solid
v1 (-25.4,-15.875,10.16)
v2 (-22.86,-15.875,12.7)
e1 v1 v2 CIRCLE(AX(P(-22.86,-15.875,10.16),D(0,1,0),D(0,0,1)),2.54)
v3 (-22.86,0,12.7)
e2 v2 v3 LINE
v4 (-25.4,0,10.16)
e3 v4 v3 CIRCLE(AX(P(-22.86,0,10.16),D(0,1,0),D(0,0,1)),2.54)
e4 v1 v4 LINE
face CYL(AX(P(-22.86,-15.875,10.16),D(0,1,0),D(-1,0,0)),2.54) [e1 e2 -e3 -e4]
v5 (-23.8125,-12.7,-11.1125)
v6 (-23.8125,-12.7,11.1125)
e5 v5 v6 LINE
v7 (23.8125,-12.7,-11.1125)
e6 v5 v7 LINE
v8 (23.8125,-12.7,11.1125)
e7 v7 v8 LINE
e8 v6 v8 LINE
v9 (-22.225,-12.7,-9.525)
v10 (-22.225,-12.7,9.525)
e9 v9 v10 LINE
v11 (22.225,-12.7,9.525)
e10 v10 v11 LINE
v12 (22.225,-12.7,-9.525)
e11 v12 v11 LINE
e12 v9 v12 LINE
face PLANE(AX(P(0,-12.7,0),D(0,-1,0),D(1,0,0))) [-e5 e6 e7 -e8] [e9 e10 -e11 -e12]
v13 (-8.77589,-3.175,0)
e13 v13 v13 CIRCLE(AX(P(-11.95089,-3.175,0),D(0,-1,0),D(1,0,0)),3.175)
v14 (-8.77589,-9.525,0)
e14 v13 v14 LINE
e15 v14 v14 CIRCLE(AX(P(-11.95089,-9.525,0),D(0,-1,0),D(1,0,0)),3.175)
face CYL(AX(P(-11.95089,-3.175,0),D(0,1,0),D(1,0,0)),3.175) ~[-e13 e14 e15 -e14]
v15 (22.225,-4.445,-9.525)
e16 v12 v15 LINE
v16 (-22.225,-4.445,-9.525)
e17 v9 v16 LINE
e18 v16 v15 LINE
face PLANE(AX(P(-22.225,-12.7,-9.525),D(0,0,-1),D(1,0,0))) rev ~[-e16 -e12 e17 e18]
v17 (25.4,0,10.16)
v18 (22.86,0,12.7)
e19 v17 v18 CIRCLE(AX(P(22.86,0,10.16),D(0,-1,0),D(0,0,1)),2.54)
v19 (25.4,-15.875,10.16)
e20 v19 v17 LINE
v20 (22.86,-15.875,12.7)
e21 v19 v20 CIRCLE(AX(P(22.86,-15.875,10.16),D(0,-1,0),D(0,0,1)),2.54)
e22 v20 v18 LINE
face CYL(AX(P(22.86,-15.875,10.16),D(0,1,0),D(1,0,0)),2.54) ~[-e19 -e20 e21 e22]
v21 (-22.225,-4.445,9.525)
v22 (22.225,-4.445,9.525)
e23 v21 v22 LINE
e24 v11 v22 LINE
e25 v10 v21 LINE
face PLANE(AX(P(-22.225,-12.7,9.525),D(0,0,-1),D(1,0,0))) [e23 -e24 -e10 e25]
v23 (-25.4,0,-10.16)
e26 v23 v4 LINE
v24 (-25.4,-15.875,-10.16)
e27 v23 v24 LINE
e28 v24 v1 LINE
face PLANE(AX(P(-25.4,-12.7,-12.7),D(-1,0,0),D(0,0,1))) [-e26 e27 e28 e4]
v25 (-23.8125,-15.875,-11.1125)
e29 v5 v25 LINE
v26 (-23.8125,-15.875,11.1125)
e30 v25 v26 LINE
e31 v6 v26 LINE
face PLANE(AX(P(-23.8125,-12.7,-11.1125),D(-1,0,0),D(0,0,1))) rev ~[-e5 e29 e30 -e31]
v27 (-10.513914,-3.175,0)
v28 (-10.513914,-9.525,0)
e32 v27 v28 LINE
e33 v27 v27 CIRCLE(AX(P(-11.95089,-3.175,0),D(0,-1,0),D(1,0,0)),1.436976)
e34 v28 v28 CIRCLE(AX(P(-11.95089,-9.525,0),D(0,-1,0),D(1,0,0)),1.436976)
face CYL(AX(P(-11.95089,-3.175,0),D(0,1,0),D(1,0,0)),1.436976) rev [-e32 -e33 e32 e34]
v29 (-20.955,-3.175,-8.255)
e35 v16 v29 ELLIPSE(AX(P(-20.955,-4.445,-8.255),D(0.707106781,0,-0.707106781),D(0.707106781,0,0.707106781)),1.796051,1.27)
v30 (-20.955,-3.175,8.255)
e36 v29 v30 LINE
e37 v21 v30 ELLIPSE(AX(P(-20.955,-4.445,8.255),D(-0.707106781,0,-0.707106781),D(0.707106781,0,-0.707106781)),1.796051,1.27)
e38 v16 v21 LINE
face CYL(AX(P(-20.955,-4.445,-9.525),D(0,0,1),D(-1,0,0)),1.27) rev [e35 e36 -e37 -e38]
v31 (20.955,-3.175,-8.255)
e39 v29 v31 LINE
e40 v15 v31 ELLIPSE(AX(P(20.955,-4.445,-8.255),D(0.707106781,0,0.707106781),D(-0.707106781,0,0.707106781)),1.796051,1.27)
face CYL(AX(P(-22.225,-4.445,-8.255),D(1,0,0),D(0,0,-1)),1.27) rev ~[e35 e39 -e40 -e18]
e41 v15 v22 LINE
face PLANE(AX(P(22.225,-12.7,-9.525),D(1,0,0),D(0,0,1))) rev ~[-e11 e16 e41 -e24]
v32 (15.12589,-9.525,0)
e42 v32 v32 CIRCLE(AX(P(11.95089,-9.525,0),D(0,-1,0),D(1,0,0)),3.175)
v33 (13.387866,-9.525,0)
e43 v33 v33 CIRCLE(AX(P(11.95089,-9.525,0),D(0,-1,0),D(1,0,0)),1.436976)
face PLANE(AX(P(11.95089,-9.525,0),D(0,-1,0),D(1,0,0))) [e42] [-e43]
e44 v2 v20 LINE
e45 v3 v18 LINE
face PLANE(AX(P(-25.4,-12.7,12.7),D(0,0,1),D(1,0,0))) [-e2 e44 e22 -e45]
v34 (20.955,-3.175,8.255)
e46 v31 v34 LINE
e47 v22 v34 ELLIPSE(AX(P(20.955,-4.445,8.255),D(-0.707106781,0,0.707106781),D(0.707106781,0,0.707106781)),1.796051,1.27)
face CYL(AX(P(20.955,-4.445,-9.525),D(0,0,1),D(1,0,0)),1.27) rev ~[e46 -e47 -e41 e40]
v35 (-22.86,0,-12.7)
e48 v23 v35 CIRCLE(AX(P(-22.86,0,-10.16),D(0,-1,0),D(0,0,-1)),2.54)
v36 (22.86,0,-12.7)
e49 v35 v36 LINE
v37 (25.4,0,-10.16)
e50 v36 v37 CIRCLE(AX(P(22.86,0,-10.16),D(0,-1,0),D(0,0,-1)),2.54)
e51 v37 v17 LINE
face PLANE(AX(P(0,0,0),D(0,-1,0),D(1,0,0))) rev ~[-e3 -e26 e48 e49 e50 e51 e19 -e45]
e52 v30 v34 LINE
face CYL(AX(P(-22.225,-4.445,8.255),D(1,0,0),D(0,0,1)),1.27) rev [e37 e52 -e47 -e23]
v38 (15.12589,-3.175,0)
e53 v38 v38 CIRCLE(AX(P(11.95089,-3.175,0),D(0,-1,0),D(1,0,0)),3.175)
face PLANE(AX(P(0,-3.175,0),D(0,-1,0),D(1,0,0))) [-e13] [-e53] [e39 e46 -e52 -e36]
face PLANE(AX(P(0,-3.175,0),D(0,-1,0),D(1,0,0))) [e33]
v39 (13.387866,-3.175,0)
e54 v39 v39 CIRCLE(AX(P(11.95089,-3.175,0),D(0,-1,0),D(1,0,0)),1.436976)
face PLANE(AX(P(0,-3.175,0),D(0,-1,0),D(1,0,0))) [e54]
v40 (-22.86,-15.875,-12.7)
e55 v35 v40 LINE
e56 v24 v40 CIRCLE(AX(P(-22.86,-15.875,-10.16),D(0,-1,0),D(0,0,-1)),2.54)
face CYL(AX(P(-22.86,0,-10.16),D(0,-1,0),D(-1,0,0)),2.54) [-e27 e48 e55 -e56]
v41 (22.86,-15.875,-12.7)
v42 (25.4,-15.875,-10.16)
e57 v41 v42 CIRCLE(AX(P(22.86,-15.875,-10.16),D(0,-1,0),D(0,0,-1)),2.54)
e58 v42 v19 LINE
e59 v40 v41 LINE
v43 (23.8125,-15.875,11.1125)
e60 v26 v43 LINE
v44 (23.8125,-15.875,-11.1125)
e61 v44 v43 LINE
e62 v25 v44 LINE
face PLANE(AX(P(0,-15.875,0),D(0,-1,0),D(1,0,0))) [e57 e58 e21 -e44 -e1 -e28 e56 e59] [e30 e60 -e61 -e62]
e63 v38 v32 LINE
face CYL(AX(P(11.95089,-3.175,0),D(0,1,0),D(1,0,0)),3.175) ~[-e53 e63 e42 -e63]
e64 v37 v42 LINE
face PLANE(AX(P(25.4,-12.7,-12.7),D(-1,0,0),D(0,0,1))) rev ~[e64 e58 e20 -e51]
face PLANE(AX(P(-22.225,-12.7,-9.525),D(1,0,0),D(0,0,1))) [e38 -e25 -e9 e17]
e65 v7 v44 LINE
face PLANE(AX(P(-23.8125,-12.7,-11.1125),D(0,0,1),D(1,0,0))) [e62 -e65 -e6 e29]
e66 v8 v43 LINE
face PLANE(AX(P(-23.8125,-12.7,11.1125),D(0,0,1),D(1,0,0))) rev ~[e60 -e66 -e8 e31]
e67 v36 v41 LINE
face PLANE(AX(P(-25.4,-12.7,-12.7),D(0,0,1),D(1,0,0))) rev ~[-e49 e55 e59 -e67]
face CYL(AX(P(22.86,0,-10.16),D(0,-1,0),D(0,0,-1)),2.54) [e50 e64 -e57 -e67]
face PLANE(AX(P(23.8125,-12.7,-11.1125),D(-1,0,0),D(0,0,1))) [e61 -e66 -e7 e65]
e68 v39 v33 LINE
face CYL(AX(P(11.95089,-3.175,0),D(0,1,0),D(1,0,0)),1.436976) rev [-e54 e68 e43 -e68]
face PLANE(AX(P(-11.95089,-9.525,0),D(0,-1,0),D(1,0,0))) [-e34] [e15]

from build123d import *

# Parameters (mm, degrees)
F0_W     = 50.8
F0_H     = 25.4
F0_W_2   = 44.45
F0_H_2   = 19.05
F1_DEPTH = 12.7
F2_W     = 44.45
F2_H     = 19.05
F3_DEPTH = 9.525
F4_R     = 1.27
F5_W     = 50.8
F5_H     = 25.4
F5_W_2   = 47.625
F5_H_2   = 22.225
F6_DEPTH = 3.175
F7_R     = 2.54
F8_R     = 3.175
F8_R_2   = 1.43697608
F9_DEPTH = 6.35


with BuildPart() as f1:
    # F0 (on Front) → F1 (new body)
    with BuildSketch(Plane.XZ):
        Rectangle(F0_W, F0_H)
        Rectangle(F0_W_2, F0_H_2, mode=Mode.SUBTRACT)
        Rectangle(F0_W_2, F0_H_2)
    extrude(amount=F1_DEPTH)

    # F2 (on face) → F3 (cut)
    with BuildSketch(Plane.XZ.offset(12.7)):
        Rectangle(F2_W, F2_H)
    extrude(amount=-F3_DEPTH, mode=Mode.SUBTRACT)

    # F4
    f4_edges = [f1.edges().sort_by_distance(p)[0] for p in [
        (22.225, -3.175, 0),
        (0, -3.175, 9.525),
        (-22.225, -3.175, 0),
        (0, -3.175, -9.525),
    ]]
    fillet(f4_edges, radius=F4_R)

    # F5 (on face) → F6 (join)
    with BuildSketch(Plane.XZ.offset(12.7)):
        Rectangle(F5_W, F5_H)
        Rectangle(F5_W_2, F5_H_2, mode=Mode.SUBTRACT)
    extrude(amount=F6_DEPTH)

    # F7
    f7_edges = [f1.edges().sort_by_distance(p)[0] for p in [
        (25.4, -7.9375, 12.7),
        (25.4, -7.9375, -12.7),
        (-25.4, -7.9375, -12.7),
        (-25.4, -7.9375, 12.7),
    ]]
    fillet(f7_edges, radius=F7_R)

    # F8 (on face) → F9 (join)
    with BuildSketch(Plane.XZ.offset(3.175)):
        with Locations((11.9508895849, 0)):
            Circle(F8_R)
        with Locations((11.9508895849, 0)):
            Circle(F8_R_2, mode=Mode.SUBTRACT)
        with Locations((-11.9508895849, 0)):
            Circle(F8_R)
        with Locations((-11.9508895849, 0)):
            Circle(F8_R_2, mode=Mode.SUBTRACT)
    extrude(amount=F9_DEPTH)


solid = f1.part
